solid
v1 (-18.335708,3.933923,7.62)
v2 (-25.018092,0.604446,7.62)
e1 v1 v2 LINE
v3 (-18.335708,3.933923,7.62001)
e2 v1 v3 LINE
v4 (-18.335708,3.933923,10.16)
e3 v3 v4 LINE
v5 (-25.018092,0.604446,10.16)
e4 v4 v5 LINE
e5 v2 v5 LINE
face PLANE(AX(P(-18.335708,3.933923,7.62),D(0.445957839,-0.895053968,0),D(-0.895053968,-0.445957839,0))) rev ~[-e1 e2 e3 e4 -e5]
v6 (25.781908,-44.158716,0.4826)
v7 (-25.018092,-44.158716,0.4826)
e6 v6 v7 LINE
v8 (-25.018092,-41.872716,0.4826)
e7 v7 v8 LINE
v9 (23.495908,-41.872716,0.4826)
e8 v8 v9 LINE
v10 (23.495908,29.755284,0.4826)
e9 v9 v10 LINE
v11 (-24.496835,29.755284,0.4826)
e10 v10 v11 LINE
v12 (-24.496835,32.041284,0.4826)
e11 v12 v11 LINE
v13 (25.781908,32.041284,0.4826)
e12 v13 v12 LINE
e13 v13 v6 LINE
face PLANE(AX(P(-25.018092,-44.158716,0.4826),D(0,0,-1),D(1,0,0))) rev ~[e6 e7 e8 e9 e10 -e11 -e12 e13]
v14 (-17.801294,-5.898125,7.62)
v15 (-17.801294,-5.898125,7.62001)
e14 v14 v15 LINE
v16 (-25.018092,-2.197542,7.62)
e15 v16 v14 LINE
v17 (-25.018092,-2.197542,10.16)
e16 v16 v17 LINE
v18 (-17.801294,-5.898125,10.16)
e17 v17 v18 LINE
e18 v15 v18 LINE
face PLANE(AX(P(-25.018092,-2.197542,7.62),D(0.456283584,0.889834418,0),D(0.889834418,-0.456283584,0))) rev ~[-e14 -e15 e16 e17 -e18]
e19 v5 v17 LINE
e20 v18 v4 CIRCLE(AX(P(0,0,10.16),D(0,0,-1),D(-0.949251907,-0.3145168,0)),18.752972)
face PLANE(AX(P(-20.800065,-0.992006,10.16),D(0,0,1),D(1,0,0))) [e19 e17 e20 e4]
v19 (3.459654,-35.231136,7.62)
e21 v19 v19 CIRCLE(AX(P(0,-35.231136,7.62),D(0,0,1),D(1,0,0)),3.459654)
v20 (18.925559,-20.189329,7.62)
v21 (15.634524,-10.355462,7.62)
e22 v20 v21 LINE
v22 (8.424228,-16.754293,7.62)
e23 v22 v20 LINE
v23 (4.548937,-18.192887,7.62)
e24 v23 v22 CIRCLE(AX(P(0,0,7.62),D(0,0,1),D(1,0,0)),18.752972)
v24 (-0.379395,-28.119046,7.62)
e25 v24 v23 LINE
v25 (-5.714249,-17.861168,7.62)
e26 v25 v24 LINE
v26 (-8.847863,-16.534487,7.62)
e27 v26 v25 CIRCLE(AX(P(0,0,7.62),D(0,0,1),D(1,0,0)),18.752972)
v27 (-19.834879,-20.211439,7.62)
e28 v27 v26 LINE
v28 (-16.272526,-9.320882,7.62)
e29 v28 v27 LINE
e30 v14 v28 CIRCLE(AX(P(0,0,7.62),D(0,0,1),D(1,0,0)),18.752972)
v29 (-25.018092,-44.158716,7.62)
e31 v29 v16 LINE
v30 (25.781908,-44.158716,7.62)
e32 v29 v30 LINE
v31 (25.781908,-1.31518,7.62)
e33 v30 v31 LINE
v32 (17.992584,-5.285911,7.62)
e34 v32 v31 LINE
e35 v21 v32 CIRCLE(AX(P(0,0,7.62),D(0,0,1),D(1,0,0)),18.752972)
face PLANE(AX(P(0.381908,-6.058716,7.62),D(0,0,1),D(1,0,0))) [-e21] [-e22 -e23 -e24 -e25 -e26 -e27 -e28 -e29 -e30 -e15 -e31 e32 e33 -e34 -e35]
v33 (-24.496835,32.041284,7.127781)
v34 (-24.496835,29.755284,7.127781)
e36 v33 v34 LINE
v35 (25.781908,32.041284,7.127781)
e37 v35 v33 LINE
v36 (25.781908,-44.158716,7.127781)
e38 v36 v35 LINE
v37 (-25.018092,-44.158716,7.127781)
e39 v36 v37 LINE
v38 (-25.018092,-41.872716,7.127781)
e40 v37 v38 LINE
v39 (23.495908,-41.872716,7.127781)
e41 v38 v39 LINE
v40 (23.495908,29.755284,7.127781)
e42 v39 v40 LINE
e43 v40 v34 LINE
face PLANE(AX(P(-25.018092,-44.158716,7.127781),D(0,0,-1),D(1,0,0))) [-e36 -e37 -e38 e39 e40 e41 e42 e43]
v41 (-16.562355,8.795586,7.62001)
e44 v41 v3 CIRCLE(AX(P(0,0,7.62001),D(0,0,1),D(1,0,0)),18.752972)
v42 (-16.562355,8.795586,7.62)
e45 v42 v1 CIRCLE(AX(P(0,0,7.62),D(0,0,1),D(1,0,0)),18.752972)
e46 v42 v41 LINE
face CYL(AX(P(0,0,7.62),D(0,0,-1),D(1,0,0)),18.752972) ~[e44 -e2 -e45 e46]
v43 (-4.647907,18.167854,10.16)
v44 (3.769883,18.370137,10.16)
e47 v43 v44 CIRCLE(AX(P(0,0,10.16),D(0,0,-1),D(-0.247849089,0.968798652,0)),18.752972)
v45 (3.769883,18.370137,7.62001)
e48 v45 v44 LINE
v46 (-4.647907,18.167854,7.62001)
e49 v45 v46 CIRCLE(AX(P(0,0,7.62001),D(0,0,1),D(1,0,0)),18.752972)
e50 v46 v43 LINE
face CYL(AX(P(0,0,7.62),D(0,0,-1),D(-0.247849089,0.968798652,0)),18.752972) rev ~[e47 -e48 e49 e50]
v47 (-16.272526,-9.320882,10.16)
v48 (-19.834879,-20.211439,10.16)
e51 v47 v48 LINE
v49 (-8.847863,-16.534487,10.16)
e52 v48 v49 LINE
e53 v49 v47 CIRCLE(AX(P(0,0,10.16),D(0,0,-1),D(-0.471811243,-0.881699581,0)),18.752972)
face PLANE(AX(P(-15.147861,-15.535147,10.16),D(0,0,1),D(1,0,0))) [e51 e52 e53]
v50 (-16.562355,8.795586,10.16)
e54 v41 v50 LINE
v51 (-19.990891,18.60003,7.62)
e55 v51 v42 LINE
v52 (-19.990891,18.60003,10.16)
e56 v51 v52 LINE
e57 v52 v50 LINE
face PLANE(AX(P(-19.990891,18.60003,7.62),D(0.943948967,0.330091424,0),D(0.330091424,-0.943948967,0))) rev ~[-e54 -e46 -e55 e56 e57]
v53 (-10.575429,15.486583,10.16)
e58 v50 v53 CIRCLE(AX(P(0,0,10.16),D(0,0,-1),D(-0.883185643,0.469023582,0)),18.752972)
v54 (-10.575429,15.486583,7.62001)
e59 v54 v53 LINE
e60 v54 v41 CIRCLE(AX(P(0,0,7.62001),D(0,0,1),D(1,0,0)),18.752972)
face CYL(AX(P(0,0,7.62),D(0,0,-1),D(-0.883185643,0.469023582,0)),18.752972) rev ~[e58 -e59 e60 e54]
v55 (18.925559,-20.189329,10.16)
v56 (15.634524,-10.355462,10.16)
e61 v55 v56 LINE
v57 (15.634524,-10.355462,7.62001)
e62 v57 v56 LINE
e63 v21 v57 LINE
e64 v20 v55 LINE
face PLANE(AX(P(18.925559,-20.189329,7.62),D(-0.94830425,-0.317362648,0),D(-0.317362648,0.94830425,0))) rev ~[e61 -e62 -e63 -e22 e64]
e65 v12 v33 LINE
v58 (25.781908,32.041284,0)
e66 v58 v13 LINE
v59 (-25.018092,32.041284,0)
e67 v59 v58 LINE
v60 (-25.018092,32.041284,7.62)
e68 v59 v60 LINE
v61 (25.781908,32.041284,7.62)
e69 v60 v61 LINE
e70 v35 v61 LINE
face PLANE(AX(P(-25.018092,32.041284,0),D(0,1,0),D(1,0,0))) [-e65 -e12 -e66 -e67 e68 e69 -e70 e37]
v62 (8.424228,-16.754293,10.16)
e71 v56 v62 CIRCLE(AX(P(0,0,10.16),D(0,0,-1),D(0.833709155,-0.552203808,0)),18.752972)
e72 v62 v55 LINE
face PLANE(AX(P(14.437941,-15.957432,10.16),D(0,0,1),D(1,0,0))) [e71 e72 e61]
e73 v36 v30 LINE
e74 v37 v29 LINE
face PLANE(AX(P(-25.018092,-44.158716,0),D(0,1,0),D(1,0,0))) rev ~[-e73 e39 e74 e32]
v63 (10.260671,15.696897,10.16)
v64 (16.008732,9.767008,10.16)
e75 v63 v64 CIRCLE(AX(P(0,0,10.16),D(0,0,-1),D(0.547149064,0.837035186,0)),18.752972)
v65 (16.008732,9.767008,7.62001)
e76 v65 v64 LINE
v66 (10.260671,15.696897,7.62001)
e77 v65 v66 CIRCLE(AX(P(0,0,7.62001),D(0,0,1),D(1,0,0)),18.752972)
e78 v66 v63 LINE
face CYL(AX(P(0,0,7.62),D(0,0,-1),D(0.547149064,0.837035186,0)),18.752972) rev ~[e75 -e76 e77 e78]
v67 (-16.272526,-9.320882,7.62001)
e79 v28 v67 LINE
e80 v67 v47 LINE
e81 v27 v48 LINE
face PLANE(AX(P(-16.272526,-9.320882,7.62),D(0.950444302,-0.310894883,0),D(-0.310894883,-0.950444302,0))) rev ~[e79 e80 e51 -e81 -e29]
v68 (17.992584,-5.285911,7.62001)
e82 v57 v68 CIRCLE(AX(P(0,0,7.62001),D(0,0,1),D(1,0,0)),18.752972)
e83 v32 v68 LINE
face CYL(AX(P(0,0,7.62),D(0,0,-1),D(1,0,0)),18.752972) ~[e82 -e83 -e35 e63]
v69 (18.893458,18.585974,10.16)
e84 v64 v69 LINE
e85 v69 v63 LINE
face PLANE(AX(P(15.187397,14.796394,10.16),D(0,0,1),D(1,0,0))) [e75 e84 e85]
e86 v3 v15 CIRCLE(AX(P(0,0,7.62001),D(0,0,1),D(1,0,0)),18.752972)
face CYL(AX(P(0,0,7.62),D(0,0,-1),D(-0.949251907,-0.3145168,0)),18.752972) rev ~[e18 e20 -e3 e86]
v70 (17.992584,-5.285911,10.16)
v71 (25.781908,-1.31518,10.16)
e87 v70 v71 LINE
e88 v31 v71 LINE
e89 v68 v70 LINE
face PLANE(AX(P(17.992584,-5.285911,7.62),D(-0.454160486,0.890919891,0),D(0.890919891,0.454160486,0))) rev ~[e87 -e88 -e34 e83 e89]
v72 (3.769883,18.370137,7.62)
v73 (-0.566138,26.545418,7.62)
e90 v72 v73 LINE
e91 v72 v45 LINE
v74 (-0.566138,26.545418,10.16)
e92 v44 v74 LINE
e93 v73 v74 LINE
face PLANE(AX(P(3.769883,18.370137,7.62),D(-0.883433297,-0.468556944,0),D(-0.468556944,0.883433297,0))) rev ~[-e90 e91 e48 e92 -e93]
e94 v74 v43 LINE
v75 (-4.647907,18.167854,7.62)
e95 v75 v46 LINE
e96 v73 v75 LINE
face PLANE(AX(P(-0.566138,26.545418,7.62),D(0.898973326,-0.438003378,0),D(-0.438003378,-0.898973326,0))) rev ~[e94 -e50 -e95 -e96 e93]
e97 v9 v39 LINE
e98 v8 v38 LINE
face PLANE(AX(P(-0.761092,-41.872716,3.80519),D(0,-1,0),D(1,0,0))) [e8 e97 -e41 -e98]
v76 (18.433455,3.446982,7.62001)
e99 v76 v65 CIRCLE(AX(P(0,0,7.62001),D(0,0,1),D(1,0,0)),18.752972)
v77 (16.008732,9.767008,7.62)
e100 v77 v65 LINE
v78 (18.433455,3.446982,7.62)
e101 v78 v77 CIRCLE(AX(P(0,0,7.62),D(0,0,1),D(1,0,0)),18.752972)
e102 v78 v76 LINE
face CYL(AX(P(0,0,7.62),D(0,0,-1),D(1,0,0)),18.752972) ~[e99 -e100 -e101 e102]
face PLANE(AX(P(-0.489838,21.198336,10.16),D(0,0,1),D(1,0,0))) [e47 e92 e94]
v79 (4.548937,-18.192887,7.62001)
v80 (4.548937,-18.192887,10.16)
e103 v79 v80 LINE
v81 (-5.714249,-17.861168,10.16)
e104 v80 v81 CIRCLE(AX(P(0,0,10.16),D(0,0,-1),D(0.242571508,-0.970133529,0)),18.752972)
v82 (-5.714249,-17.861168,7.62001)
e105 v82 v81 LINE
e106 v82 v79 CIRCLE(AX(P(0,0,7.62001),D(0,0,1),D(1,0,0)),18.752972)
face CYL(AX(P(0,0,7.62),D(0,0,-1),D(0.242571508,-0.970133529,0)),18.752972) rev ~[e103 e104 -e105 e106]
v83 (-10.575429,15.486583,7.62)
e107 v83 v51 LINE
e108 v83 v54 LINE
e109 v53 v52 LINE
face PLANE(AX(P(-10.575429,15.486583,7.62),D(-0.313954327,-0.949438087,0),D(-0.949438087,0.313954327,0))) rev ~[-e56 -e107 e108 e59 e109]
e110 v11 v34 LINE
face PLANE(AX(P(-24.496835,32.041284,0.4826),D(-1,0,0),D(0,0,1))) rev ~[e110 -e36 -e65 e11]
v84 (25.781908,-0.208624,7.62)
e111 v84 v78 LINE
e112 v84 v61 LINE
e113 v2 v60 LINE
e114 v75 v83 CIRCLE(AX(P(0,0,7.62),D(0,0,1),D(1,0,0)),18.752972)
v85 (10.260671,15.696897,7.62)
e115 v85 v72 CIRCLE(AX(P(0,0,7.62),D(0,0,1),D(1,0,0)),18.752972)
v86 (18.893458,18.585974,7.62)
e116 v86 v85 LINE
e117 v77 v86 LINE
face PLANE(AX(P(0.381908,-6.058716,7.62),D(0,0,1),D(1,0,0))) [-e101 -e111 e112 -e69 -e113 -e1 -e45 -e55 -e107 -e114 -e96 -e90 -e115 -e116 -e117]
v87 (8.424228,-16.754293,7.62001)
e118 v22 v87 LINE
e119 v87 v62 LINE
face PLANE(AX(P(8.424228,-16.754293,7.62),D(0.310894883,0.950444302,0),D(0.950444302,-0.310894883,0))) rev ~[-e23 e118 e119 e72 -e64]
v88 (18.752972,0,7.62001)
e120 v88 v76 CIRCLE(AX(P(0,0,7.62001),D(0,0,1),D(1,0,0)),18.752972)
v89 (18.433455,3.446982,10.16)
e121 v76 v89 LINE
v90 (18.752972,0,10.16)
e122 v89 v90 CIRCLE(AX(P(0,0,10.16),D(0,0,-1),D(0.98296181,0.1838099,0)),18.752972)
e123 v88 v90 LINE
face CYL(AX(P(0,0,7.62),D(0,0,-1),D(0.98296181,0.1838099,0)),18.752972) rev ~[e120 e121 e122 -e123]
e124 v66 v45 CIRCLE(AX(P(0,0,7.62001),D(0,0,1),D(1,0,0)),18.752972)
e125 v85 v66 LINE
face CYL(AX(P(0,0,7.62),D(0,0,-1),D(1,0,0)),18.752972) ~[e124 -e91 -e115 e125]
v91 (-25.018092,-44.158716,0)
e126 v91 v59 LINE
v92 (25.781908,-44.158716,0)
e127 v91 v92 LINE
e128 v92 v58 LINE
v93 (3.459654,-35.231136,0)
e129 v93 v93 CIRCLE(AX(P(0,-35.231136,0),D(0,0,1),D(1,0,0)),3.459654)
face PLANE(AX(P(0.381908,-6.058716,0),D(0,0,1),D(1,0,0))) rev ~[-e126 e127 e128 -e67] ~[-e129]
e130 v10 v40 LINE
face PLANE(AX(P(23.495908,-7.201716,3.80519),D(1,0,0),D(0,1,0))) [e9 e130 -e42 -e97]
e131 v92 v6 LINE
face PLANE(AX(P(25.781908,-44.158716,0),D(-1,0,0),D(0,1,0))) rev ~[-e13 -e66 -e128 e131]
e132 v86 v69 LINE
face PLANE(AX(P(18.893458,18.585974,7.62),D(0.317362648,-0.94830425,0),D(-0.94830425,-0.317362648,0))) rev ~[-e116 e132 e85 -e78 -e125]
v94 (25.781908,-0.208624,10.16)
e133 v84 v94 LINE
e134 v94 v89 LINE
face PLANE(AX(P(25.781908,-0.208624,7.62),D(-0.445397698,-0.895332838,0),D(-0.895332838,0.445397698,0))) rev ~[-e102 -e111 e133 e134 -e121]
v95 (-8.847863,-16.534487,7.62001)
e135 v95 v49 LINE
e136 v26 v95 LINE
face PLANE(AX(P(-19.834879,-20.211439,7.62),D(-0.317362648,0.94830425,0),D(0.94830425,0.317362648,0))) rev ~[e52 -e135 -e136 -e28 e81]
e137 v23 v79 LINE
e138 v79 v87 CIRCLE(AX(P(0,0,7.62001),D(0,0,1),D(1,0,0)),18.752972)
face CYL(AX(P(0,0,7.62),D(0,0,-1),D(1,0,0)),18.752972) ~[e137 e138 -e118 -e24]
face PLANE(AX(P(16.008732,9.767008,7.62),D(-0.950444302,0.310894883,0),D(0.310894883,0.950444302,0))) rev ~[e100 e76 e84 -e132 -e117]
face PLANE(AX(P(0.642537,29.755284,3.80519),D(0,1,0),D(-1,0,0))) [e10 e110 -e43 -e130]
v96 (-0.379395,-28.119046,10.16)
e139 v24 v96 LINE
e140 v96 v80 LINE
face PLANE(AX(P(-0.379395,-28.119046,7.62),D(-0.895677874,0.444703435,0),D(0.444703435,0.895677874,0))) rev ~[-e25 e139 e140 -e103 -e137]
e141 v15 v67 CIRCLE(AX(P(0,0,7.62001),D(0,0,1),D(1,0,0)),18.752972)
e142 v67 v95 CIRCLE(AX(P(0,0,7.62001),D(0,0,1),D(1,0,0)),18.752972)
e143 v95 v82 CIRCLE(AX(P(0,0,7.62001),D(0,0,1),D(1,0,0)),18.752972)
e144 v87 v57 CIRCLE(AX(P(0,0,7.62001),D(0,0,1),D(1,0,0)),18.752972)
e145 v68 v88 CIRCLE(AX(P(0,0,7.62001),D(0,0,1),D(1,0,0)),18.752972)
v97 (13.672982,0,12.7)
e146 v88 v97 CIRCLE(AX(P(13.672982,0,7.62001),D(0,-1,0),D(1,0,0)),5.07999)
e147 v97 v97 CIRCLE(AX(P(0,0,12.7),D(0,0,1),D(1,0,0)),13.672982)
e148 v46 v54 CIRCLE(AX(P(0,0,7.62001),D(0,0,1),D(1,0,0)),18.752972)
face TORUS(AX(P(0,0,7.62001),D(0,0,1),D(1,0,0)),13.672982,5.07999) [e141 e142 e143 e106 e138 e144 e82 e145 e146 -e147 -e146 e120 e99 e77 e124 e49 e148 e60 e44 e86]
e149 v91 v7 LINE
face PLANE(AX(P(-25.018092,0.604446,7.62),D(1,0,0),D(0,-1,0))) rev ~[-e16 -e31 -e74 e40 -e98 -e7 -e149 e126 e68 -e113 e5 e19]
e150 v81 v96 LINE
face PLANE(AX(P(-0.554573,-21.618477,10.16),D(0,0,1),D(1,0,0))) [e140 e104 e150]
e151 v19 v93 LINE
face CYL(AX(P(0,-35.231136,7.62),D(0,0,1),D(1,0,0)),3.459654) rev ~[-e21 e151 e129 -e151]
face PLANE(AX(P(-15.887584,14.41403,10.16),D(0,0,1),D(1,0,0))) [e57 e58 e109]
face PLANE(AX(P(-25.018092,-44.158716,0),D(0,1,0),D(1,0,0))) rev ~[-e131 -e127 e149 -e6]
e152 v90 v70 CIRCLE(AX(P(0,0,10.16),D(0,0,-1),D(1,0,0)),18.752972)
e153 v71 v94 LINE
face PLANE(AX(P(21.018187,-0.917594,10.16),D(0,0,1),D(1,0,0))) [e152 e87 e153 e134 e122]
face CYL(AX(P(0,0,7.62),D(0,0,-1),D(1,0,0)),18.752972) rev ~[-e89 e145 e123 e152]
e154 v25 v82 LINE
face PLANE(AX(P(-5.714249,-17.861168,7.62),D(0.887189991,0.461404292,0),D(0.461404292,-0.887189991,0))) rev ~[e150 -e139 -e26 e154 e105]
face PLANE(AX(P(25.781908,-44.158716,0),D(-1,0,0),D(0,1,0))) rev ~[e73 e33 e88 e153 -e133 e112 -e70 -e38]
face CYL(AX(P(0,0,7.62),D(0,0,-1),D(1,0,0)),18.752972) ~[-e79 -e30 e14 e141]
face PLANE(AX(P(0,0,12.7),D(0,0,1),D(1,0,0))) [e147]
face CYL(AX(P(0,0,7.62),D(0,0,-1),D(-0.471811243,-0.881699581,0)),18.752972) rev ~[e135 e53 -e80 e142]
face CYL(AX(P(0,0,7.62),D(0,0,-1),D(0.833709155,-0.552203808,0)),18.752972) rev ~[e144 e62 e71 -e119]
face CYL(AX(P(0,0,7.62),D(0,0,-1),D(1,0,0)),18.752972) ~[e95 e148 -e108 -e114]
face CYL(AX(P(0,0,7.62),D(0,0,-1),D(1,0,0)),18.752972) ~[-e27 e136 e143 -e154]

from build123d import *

# Parameters (mm, degrees)
F0_W      = 50.8
F0_H      = 76.2
F1_DEPTH  = 7.62
F2_R      = 18.7529717457
F3_DEPTH  = 5.08
F4_R      = 5.07999
F7_DEPTH  = 2.54
F8_W      = 50.2787431046
F8_H      = 6.6451809329
F9_DEPTH  = 2.286
F10_W     = 73.914
F10_H     = 6.6451809329
F11_DEPTH = 2.286
F12_W     = 48.514
F12_H     = 6.6451809329
F13_DEPTH = 2.286
F14_R     = 3.4596539052
F15_DEPTH = 25.4


# Not quite as in the source:
# - a fillet or chamfer is up to 0.001 mm smaller than in the source, because OpenCascade refuses the exact size


with BuildPart() as f1:
    # F0 (on Top) → F1 (new body)
    with BuildSketch(Plane.XY):
        with Locations((0.3819083795, -6.0587156958)):
            Rectangle(F0_W, F0_H)
    extrude(amount=F1_DEPTH)

    # F2 (on face) → F3 (join)
    with BuildSketch(Plane.XY.offset(7.62)):
        Circle(F2_R)
    extrude(amount=F3_DEPTH)

    # F4 (radius 5.08 in the source; OpenCascade refuses exactly that, so slightly less here)
    f4_edges = [f1.edges().sort_by_distance(p)[0] for p in [
        (-18.752972, 0, 12.7),
    ]]
    fillet(f4_edges, radius=F4_R)

    # F5 (on face) + F6 (on face) → F7 (join)
    with BuildSketch(Plane.XY.offset(7.62)):
        with BuildLine():
            ThreePointArc((-17.8012941845, -5.8981246722), (-18.7253311698, -1.0178024727), (-18.33570835, 3.9339228004))
            Line((-18.33570835, 3.9339228004), (-25.0180916205, 0.604446249))
            Line((-25.0180916205, 0.604446249), (-25.0180916205, -2.1975415816))
            Line((-25.0180916205, -2.1975415816), (-17.8012941845, -5.8981246722))
        make_face()
        with BuildLine():
            Line((-0.56613778, 26.5454184264), (-4.6479069665, 18.1678537567))
            ThreePointArc((-4.6479069665, 18.1678537567), (-0.450512239, 18.7475595216), (3.7698827091, 18.3701370069))
            Line((3.7698827091, 18.3701370069), (-0.56613778, 26.5454184264))
        make_face()
        with BuildLine():
            Line((18.8934579492, 18.5859743506), (10.2606709283, 15.6968971901))
            ThreePointArc((10.2606709283, 15.6968971901), (13.4651875999, 13.0523052444), (16.0087319261, 9.7670083143))
            Line((16.0087319261, 9.7670083143), (18.8934579492, 18.5859743506))
        make_face()
        with BuildLine():
            Line((25.7819083795, -1.3151803242), (25.7819083795, -0.2086242448))
            Line((25.7819083795, -0.2086242448), (18.4334550561, 3.4469818664))
            ThreePointArc((18.4334550561, 3.4469818664), (18.6729217202, 1.7308794659), (18.7529717457, 0))
            ThreePointArc((18.7529717457, 0), (18.5619015059, -2.6701613771), (17.9925843387, -5.2859112847))
            Line((17.9925843387, -5.2859112847), (25.7819083795, -1.3151803242))
        make_face()
        with BuildLine():
            ThreePointArc((15.6345242212, -10.3554624074), (12.4475757879, -14.0261115887), (8.4242275529, -16.7542931642))
            Line((8.4242275529, -16.7542931642), (18.9255586046, -20.1893288404))
            Line((18.9255586046, -20.1893288404), (15.6345242212, -10.3554624074))
        make_face()
        with BuildLine():
            ThreePointArc((4.5489366376, -18.1928866528), (-0.6058031571, -18.7431841433), (-5.7142487726, -17.8611676623))
            Line((-5.7142487726, -17.8611676623), (-0.3793946235, -28.119046241))
            Line((-0.3793946235, -28.119046241), (4.5489366376, -18.1928866528))
        make_face()
        with BuildLine():
            ThreePointArc((-8.8478629176, -16.5344873245), (-13.0678043341, -13.4501464371), (-16.2725260484, -9.3208822167))
            Line((-16.2725260484, -9.3208822167), (-19.8348792175, -20.2114386703))
            Line((-19.8348792175, -20.2114386703), (-8.8478629176, -16.5344873245))
        make_face()
    with BuildSketch(Plane.XY.offset(7.62)):
        with BuildLine():
            Line((-10.5754289904, 15.4865829337), (-19.9908912182, 18.6000298709))
            Line((-19.9908912182, 18.6000298709), (-16.5623554019, 8.7955859859))
            ThreePointArc((-16.5623554019, 8.7955859859), (-13.9752350774, 12.5046692809), (-10.5754289904, 15.4865829337))
        make_face()
    extrude(amount=F7_DEPTH)

    # F8 (on face) → F9 (cut)
    with BuildSketch(Plane(origin=(0, 32.0412843042, 0), x_dir=(-1, 0, 0), z_dir=(0, 1, 0))):
        with Locations((-0.6425368272, 3.8051904665)):
            Rectangle(F8_W, F8_H)
    extrude(amount=-F9_DEPTH, mode=Mode.SUBTRACT)

    # F10 (on face) → F11 (cut)
    with BuildSketch(Plane.YZ.offset(25.7819083795)):
        with Locations((-7.2017156958, 3.8051904665)):
            Rectangle(F10_W, F10_H)
    extrude(amount=-F11_DEPTH, mode=Mode.SUBTRACT)

    # F12 (on face) → F13 (cut)
    with BuildSketch(Plane.XZ.offset(44.1587156958)):
        with Locations((-0.7610916205, 3.8051904665)):
            Rectangle(F12_W, F12_H)
    extrude(amount=-F13_DEPTH, mode=Mode.SUBTRACT)

    # F14 (on face) → F15 (cut)
    with BuildSketch(Plane.XY.offset(7.62)):
        with Locations((0, -35.2311357856)):
            Circle(F14_R)
    extrude(amount=-F15_DEPTH, mode=Mode.SUBTRACT)


solid = f1.part
